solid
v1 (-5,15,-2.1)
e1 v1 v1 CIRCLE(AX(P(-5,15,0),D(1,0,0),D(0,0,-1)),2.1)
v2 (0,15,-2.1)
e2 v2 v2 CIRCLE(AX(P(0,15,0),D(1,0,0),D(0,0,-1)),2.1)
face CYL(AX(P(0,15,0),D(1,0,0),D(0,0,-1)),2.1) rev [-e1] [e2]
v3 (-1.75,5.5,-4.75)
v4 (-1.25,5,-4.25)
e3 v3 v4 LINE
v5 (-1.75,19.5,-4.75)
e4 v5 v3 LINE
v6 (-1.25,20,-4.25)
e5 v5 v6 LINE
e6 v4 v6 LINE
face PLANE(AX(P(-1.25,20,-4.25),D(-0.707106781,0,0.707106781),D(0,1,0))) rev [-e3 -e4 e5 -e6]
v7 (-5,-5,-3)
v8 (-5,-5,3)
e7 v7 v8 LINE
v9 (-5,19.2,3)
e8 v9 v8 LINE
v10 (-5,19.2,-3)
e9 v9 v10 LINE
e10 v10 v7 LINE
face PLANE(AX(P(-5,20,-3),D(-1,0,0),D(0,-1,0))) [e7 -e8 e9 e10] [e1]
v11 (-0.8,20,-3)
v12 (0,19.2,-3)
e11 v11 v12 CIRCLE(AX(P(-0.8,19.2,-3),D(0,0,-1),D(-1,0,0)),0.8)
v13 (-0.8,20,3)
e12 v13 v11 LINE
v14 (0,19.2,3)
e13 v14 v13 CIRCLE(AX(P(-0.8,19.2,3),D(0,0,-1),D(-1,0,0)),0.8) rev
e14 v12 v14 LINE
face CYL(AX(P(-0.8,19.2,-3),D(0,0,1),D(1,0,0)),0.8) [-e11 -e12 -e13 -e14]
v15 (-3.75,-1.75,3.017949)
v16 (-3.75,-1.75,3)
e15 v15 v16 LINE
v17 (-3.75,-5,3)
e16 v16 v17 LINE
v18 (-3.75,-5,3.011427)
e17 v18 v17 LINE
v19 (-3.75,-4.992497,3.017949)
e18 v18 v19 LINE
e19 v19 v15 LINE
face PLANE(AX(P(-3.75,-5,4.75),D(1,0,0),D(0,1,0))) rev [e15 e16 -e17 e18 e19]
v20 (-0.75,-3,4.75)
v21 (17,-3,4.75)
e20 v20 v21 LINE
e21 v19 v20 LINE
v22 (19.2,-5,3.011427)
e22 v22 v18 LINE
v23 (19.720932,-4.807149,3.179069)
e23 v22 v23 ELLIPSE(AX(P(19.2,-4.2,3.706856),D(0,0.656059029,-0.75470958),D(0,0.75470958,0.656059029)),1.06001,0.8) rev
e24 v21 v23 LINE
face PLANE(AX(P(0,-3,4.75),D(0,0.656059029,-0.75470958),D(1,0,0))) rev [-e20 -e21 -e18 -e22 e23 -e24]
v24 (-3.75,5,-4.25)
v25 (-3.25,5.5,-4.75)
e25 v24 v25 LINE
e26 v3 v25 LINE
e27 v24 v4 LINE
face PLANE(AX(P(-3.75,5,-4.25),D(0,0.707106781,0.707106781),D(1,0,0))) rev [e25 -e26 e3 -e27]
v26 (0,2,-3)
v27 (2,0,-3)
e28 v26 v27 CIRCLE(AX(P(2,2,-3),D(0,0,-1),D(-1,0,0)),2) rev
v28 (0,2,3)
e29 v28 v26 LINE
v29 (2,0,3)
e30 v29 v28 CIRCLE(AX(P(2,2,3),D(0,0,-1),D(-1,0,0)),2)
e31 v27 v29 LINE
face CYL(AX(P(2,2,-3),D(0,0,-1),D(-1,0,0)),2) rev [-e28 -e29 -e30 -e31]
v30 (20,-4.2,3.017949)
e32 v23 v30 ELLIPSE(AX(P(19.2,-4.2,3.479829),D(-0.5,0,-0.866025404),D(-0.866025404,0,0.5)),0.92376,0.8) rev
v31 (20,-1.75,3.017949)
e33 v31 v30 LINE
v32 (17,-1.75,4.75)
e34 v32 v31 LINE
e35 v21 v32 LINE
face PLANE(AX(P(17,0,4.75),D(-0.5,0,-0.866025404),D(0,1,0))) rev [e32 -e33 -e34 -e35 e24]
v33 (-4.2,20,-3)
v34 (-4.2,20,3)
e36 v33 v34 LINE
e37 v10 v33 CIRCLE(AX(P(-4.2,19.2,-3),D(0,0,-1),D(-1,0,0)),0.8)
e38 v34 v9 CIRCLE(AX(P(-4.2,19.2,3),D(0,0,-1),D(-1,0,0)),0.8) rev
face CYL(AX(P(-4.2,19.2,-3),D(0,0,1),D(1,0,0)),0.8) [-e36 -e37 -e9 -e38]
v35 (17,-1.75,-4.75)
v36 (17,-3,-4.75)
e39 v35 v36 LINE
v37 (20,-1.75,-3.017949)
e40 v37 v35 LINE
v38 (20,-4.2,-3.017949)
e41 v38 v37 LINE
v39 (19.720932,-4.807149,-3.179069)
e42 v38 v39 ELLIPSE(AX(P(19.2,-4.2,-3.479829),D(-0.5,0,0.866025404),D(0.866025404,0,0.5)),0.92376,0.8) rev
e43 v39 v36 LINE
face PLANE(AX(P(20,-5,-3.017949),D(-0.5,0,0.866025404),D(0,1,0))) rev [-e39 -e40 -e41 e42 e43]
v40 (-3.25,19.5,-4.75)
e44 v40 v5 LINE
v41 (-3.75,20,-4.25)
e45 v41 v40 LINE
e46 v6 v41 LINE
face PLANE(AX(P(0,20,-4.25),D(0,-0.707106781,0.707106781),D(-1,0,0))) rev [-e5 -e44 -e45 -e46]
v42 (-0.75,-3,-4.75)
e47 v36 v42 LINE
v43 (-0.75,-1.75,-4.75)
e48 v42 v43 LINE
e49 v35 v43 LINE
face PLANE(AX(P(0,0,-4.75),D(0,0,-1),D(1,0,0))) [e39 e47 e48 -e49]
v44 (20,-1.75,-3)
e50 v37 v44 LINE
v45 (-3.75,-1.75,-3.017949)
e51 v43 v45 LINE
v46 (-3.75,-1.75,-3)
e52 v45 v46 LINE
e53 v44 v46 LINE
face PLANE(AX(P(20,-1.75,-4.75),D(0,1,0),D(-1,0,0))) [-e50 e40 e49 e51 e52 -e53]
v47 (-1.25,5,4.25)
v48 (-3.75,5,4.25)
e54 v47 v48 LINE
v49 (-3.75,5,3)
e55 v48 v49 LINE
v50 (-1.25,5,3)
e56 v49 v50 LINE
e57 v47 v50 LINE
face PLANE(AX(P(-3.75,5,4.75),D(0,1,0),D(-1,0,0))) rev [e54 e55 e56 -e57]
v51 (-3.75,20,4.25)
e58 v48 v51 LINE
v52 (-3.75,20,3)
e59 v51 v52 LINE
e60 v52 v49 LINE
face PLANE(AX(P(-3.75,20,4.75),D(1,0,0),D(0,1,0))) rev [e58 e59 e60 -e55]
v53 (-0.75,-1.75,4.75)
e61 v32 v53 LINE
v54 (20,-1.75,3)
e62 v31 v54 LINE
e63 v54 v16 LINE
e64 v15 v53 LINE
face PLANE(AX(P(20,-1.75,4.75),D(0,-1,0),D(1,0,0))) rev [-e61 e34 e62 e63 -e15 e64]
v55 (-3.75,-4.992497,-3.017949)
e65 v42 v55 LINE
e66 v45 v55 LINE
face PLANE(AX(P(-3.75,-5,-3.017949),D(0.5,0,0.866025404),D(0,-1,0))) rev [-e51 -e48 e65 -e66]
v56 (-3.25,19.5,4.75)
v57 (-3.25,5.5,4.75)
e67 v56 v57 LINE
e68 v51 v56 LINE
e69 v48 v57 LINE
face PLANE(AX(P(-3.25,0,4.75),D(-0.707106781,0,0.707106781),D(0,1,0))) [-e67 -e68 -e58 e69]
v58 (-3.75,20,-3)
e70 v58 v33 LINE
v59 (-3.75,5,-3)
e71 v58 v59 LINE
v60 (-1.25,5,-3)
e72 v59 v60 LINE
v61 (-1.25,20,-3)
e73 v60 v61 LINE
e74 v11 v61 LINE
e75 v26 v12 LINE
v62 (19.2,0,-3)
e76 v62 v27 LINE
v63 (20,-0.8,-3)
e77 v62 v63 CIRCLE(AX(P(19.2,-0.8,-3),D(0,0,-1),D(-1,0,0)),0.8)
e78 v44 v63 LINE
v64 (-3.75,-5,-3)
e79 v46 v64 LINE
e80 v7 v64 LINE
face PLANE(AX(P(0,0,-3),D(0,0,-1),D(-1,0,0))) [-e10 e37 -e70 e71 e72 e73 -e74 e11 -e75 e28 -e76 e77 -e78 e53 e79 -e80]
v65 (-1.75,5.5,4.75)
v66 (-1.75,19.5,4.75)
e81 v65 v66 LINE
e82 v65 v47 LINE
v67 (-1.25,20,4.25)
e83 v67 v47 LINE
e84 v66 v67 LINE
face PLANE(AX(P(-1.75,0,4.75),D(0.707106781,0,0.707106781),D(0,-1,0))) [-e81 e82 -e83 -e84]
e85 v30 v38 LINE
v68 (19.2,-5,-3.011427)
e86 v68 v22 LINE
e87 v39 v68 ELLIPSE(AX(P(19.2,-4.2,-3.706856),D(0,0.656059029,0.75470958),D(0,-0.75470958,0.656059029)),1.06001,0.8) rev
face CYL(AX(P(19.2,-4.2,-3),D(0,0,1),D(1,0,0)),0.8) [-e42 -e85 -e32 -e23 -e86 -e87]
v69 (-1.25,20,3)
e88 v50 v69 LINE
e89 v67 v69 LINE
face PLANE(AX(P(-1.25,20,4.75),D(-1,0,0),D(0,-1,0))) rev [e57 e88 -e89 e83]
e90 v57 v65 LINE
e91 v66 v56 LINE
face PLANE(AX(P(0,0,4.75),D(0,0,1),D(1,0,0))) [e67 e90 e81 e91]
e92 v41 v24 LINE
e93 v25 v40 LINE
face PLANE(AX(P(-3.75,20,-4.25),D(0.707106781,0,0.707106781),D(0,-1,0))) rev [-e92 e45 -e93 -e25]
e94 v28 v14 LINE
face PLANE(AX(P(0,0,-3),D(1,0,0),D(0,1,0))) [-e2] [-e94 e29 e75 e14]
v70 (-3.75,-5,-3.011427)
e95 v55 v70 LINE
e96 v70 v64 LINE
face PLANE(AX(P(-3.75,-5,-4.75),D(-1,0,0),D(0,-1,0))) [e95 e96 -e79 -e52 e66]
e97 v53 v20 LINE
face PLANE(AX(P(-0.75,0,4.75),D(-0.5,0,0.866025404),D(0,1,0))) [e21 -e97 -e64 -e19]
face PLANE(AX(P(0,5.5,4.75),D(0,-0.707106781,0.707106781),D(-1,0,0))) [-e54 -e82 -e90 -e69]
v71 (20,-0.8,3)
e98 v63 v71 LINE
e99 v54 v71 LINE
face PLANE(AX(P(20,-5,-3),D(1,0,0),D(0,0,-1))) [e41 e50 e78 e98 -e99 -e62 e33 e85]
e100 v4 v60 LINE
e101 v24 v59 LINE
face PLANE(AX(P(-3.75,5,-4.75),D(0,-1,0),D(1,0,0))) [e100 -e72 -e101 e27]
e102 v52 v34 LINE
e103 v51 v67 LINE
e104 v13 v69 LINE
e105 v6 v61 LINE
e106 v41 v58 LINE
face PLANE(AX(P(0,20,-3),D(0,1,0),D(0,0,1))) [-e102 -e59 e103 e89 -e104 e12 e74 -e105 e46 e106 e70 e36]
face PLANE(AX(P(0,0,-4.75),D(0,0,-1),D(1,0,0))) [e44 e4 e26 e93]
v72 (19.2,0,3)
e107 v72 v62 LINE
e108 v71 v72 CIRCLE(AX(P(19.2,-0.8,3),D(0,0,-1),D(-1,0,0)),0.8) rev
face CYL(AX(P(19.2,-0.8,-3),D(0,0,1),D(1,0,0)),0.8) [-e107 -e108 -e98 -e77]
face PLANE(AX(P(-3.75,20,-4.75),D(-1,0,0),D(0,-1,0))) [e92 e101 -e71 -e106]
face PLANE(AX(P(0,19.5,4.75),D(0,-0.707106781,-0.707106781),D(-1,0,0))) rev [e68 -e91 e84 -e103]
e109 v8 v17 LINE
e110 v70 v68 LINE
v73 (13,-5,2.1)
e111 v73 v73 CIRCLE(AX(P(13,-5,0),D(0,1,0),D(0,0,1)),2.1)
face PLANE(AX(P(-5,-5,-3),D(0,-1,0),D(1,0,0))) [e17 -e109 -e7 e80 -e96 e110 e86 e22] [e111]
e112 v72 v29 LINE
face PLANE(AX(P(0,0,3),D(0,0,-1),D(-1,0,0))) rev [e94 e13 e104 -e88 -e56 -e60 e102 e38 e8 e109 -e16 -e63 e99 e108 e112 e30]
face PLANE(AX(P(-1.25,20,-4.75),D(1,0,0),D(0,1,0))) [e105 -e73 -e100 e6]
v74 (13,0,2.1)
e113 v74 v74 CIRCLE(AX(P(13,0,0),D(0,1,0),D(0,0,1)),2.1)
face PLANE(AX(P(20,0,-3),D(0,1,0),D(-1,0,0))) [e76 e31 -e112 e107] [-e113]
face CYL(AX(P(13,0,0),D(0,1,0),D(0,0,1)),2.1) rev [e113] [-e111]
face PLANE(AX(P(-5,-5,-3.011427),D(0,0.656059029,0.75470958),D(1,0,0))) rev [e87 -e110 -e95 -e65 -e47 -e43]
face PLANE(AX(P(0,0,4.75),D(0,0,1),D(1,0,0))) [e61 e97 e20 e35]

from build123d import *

# Parameters (mm, degrees)
EXTRUDE1_DEPTH        = 3
EXTRUDE1_DEPTH_BACK   = 3
SKETCH2_W             = 2.5
SKETCH2_H             = 15
SKETCH2_W_2           = 23.75
SKETCH2_H_2           = 3.25
EXTRUDE2_DEPTH        = 1.75
CHAMFER1_SIZE         = 3
CHAMFER1_SIZE2        = 1.732050808
CHAMFER2_SIZE         = 2
CHAMFER2_SIZE2        = 1.738573476
CHAMFER3_SIZE         = 0.5
FILLET1_R             = 0.8
FILETE1_R             = 2
FURO_ROSCADO_DE_M51_D = 4.2
FURO_ROSCADO_DE_M52_D = 4.2


# Read off the part's stored shape, not the designer's step: Mirror1
with BuildPart() as part:
    # Sketch1 → Extrude1 (new, two sides: drawn at the far end of the back side and taken through both)
    with BuildSketch(Plane.XY.offset(-EXTRUDE1_DEPTH_BACK)):
        Polygon((0, 0), (0, 20), (-5, 20), (-5, -5), (20, -5), (20, 0), align=None)
    extrude(amount=EXTRUDE1_DEPTH + EXTRUDE1_DEPTH_BACK)

    # Sketch2 → Extrude2 (add)
    with BuildSketch(Plane.XY.offset(3)):
        with Locations((-2.5, 12.5)):
            Rectangle(SKETCH2_W, SKETCH2_H)
        with Locations((8.125, -3.375)):
            Rectangle(SKETCH2_W_2, SKETCH2_H_2)
    extrude(amount=EXTRUDE2_DEPTH)

    # Chamfer1
    chamfer1_edges = [part.edges().sort_by_distance(p)[0] for p in [
        (20, -3.375, 4.75),
        (-3.75, -3.375, 4.75),
    ]]
    chamfer1_side = [part.faces().sort_by_distance(p)[0] for p in [
        (8.125, -3.375, 4.75),
    ]]
    chamfer(chamfer1_edges, length=CHAMFER1_SIZE, length2=CHAMFER1_SIZE2, reference=chamfer1_side[0])

    # Chamfer2
    chamfer2_edges = [part.edges().sort_by_distance(p)[0] for p in [
        (8.125, -5, 4.75),
    ]]
    chamfer2_side = [part.faces().sort_by_distance(p)[0] for p in [
        (8.125, -3.375, 4.75),
    ]]
    chamfer(chamfer2_edges, length=CHAMFER2_SIZE, length2=CHAMFER2_SIZE2, reference=chamfer2_side[0])

    # Chamfer3
    chamfer3_edges = [part.edges().sort_by_distance(p)[0] for p in [
        (-2.5, 20, 4.75),
        (-1.25, 12.5, 4.75),
        (-2.5, 5, 4.75),
        (-3.75, 12.5, 4.75),
    ]]
    chamfer(chamfer3_edges, length=CHAMFER3_SIZE)

    # Mirror1: part across plane


with BuildPart() as part_1:
    add(part.part)
    add(part.part.mirror(Plane.XY))

    # Fillet1
    fillet1_edges = [part_1.edges().sort_by_distance(p)[0] for p in [
        (-5, 20, 0),
        (20, -5, 0),
        (20, 0, 0),
        (0, 20, 0),
    ]]
    fillet(fillet1_edges, radius=FILLET1_R)

    # Filete1
    filete1_edges = [part_1.edges().sort_by_distance(p)[0] for p in [
        (0, 0, 0),
    ]]
    fillet(filete1_edges, radius=FILETE1_R)

    # Furo roscado de M51 (through all)
    with Locations(Plane(origin=(0, 0, 0), x_dir=(1, 0, 0), z_dir=(0, 1, 0))):
        with Locations((13, 0)):
            Hole(FURO_ROSCADO_DE_M51_D / 2)

    # Furo roscado de M52 (through all)
    with Locations(Plane(origin=(0, 0, 0), x_dir=(0, 0, -1), z_dir=(1, 0, 0))):
        with Locations((0, 15)):
            Hole(FURO_ROSCADO_DE_M52_D / 2)


solid = part_1.part
